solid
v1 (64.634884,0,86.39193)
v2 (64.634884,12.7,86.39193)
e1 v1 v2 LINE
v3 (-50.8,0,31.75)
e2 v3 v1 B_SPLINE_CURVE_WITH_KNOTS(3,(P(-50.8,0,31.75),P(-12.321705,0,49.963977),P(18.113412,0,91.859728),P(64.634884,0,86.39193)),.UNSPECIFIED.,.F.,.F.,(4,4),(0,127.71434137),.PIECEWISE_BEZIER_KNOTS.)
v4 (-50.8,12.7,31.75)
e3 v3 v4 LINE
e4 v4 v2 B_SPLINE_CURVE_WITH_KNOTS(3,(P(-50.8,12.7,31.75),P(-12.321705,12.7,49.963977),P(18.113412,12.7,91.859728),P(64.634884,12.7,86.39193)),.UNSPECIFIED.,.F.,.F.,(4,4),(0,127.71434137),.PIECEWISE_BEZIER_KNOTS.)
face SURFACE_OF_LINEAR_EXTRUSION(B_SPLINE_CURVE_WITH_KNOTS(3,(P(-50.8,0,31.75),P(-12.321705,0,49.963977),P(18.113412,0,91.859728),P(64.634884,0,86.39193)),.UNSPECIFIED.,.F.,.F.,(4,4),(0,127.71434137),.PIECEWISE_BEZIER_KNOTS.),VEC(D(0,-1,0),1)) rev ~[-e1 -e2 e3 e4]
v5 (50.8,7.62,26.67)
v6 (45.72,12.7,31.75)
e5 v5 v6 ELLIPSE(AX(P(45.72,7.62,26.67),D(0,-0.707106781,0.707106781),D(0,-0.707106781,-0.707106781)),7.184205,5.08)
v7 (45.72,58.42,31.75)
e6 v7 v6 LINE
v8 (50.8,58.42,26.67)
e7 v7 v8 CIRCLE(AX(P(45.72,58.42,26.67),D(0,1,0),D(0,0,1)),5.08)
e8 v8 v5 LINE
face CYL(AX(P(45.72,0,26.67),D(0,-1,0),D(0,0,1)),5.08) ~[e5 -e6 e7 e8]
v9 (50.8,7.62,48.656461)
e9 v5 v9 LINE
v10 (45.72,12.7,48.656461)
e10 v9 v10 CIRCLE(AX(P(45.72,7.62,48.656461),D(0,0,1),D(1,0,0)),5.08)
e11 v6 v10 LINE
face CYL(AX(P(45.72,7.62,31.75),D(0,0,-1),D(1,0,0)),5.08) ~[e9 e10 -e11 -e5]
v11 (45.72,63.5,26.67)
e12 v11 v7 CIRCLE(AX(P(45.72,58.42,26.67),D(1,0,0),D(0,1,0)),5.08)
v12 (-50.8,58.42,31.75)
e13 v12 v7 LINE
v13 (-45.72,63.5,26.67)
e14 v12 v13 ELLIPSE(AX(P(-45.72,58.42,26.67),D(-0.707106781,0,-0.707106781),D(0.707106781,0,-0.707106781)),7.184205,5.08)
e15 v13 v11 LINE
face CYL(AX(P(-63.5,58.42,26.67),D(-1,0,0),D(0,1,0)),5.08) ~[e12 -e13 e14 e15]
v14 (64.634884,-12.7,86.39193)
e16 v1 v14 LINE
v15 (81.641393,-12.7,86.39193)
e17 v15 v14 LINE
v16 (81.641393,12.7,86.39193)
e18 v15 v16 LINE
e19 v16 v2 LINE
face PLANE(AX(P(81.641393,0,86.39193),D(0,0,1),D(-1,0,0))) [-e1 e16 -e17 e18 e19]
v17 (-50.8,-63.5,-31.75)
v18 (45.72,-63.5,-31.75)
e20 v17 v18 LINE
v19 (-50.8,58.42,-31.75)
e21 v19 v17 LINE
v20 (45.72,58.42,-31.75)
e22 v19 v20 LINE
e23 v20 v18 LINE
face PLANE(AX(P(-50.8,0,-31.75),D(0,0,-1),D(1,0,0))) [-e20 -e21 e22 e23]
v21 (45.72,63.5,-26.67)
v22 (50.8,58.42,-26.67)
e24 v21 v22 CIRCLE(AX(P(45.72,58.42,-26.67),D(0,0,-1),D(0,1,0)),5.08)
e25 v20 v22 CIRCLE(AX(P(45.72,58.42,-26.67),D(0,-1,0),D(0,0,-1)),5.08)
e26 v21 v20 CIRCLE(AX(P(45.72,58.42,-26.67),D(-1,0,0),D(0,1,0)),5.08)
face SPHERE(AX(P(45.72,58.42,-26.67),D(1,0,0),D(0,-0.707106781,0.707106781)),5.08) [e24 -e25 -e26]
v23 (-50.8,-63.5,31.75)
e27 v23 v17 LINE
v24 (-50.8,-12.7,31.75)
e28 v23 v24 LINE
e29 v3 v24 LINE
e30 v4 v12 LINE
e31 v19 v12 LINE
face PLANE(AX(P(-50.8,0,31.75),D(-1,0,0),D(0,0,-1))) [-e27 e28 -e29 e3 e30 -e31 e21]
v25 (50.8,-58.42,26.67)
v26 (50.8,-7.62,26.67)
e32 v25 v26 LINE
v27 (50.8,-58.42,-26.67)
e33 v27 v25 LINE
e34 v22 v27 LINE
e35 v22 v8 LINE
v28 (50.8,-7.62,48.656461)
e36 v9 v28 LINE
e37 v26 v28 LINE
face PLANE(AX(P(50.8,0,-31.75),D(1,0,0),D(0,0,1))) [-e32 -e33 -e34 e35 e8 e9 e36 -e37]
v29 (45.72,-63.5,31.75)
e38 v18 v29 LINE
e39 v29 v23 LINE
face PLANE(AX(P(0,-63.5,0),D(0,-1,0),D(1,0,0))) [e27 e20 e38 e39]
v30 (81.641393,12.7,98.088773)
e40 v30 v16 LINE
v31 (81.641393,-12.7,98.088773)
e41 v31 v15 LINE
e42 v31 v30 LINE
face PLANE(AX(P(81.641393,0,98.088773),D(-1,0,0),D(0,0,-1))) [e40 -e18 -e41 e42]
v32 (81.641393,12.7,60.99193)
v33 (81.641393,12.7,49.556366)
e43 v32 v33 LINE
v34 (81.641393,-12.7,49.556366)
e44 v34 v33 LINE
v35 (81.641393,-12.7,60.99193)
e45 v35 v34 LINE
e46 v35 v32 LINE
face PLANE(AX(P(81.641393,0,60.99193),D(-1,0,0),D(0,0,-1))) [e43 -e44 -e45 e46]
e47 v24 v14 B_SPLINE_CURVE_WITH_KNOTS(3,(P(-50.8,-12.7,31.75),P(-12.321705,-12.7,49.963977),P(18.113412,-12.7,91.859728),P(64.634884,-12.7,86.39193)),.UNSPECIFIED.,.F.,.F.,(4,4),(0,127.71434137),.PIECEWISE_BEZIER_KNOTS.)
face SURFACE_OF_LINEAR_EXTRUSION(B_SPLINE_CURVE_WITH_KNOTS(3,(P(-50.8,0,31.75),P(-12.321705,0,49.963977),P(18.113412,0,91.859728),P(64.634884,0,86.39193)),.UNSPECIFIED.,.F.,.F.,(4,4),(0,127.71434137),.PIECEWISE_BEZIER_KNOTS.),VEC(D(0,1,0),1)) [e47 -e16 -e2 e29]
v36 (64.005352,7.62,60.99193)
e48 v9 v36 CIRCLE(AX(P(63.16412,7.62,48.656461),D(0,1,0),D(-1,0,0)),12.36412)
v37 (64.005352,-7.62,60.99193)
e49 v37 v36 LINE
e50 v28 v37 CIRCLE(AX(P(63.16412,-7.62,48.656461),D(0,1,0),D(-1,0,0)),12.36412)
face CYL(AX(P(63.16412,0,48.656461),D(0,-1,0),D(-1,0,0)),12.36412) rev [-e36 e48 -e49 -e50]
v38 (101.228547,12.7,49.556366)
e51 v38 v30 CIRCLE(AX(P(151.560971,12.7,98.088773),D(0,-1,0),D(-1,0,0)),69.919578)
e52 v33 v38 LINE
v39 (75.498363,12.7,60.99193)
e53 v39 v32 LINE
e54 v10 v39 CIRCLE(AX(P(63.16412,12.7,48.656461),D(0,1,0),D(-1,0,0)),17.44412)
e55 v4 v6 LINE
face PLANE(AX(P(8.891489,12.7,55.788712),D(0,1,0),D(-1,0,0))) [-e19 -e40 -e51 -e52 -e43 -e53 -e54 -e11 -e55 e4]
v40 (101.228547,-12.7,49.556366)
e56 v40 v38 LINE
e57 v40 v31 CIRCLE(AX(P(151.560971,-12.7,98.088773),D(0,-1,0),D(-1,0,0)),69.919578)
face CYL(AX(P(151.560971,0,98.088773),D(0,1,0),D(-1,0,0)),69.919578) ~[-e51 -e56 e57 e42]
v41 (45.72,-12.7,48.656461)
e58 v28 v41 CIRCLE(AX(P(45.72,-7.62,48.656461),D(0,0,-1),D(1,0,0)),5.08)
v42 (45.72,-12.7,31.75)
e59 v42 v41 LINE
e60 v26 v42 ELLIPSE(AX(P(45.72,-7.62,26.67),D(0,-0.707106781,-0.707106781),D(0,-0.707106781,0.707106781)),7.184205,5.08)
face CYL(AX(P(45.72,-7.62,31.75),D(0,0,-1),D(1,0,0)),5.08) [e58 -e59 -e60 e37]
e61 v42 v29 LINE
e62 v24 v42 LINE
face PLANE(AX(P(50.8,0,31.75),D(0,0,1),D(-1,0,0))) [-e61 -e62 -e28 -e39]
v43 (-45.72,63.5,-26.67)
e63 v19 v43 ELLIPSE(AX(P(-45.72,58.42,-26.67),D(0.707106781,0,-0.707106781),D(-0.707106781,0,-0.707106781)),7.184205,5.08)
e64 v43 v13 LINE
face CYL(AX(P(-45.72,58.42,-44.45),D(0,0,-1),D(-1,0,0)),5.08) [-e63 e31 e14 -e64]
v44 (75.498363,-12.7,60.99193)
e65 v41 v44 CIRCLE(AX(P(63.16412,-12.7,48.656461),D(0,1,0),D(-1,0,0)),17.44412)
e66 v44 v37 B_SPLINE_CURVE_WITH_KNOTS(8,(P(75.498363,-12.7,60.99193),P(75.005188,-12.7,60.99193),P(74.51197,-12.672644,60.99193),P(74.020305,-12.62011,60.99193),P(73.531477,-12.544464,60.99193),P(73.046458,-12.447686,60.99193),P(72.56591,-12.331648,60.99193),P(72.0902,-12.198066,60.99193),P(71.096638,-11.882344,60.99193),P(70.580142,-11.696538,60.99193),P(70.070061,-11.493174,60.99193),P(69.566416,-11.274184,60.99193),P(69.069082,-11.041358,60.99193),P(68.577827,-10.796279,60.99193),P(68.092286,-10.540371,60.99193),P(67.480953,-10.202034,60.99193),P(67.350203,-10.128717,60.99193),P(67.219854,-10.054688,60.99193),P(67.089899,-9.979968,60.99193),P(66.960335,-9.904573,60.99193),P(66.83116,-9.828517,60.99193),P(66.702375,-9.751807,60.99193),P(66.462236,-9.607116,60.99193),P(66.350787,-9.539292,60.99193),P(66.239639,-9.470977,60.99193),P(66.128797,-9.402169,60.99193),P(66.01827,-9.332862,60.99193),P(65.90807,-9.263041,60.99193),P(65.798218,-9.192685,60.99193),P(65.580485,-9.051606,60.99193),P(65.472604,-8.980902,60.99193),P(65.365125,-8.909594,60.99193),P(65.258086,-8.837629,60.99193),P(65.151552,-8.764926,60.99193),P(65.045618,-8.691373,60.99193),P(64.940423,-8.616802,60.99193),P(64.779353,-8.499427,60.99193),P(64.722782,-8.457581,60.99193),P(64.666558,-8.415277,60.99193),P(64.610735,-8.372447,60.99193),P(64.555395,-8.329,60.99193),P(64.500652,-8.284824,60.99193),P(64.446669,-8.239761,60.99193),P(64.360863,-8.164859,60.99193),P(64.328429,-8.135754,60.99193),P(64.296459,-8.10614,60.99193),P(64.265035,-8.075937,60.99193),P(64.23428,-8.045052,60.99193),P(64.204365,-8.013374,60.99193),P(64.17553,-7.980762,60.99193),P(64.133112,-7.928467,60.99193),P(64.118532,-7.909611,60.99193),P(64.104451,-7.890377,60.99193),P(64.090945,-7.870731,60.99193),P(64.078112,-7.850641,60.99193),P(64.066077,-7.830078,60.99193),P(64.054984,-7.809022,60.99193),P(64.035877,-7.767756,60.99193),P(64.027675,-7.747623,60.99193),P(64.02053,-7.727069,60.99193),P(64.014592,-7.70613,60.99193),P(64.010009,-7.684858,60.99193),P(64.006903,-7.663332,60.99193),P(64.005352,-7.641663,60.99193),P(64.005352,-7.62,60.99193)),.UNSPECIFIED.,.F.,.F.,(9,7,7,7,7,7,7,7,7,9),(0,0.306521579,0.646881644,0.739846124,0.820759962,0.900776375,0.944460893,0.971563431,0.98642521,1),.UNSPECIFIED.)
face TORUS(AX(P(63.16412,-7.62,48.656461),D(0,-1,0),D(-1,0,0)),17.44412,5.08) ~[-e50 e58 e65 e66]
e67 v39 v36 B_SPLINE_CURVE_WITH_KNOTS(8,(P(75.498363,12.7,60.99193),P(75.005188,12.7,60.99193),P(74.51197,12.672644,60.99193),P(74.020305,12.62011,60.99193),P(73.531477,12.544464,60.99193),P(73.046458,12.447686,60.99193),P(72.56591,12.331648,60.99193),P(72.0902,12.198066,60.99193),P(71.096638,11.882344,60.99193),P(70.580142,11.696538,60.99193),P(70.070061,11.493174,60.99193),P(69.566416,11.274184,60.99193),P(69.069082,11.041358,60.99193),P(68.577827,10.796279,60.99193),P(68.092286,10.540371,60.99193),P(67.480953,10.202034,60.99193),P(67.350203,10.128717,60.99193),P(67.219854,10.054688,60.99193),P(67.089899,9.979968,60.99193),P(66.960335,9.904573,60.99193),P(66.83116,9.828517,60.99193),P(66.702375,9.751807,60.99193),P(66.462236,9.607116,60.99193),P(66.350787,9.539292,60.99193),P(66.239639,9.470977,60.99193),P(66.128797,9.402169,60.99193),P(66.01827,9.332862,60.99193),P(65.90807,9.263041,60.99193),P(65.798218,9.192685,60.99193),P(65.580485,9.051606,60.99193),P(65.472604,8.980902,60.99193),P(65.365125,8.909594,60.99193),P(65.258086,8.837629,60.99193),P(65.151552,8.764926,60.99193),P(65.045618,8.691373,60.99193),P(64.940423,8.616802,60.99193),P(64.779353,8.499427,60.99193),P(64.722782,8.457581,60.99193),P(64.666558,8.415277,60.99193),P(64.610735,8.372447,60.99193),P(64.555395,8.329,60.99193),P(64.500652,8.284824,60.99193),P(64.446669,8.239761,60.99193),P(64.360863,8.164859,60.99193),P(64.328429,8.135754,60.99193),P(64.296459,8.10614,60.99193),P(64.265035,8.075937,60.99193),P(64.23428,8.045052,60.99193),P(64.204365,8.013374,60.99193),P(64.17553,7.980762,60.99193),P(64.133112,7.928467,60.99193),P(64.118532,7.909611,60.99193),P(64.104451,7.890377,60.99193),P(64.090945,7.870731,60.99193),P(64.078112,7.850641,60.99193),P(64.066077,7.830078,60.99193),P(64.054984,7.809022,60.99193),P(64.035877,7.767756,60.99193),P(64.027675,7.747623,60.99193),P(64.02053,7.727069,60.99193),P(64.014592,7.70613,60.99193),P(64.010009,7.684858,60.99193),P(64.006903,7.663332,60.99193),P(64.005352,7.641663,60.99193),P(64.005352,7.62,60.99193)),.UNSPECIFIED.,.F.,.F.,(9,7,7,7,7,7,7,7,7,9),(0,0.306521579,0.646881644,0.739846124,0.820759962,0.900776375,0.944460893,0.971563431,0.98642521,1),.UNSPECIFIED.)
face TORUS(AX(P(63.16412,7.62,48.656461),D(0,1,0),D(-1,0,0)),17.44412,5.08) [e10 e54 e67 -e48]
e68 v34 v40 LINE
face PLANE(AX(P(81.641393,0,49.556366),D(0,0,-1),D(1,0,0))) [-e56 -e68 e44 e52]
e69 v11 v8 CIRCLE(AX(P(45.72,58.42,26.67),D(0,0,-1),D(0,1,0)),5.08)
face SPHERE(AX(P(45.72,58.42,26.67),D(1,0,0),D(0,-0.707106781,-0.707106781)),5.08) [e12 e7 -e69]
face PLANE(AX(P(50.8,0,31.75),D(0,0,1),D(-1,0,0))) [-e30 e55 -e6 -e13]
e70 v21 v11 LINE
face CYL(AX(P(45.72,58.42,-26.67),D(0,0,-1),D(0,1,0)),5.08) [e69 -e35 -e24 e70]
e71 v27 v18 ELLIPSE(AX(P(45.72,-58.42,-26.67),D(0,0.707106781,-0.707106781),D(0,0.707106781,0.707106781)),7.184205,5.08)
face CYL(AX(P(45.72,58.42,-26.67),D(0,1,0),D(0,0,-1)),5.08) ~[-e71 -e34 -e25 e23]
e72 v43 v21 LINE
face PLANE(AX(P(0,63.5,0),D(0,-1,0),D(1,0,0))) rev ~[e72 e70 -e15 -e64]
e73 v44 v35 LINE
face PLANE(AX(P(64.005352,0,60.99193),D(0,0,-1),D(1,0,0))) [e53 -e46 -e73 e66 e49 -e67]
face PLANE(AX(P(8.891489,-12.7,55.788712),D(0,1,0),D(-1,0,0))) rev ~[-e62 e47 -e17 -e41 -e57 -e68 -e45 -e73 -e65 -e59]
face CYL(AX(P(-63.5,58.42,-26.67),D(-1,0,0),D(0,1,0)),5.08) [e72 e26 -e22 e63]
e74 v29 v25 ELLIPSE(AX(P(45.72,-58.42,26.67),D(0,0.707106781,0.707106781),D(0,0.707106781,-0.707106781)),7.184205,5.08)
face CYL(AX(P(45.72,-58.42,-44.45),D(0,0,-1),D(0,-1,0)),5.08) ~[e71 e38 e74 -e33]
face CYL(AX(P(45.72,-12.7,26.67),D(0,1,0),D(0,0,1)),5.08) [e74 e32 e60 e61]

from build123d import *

# Parameters (mm, degrees)
F1_DEPTH     = 63.5
F2_DEPTH     = 12.7
F2_FACE_W    = 69.919578209
F2_FACE_H    = 25.4
F4_T1_DEPTH  = 134.62
F4_T3_DEPTH  = 53.34
F4_T5_DEPTH  = 45.72
F4_T7_DEPTH  = 16.9064607487
F4_T9_DEPTH  = 63.5
F4_T11_DEPTH = 88.9
F4_T13_DEPTH = 109.22
F4_S17_W     = 5.08
F4_S17_H     = 5.08
F4_T18_DEPTH = 5.08
F4_S23_W     = 5.08
F4_S23_H     = 5.08
F4_T24_DEPTH = 5.08
F4_T28_ANGLE = 152.7793054157
F4_T30_ANGLE = 152.7793054157
F4_T35_DEPTH = 58.42
F4_T39_DEPTH = 29.6064607487
F4_T46_DEPTH = 76.2
F4_T50_DEPTH = 29.6064607487


# Not quite as in the source:
# - a fillet or chamfer that OpenCascade refuses, or shapes differently, is made with other operations: its cross-section is extruded or revolved along the edge and cut away or added


with BuildPart() as f1:
    # F0 (on Front) → F1 (new body, symmetric)
    with BuildSketch(Plane.XZ):
        Polygon((-50.8, 31.75), (-50.8, -31.75), (50.8, -31.75), (50.8, 31.75), (25.4, 31.75), align=None)
    extrude(amount=F1_DEPTH, both=True)

    # F0 (on Front) → F2 (join, symmetric)
    with BuildSketch(Plane.XZ):
        with BuildLine():
            add(Edge.make_bspline(
                [(-50.8, 31.75), (-12.3217052749, 49.9639766453), (18.113411963, 91.8597280979), (64.6348841752, 86.3919299359)],
                knots=[0, 0, 0, 0, 127.7143413704, 127.7143413704, 127.7143413704, 127.7143413704], degree=3))
            Line((-50.8, 31.75), (25.4, 31.75))
            Line((25.4, 31.75), (25.4, 48.6564607487))
            ThreePointArc((25.4, 48.6564607487), (36.9860122893, 75.8747531778), (64.6348841752, 86.3919299359))
        make_face()
        with BuildLine():
            Line((25.4, 31.75), (50.8, 31.75))
            Line((50.8, 31.75), (50.8, 48.6564607487))
            ThreePointArc((50.8, 48.6564607487), (54.7240260068, 57.691740436), (64.0053517954, 60.9919299359))
            Line((64.0053517954, 60.9919299359), (81.6413929723, 60.9919299359))
            Line((81.6413929723, 60.9919299359), (81.6413929723, 86.3919299359))
            Line((81.6413929723, 86.3919299359), (64.6348841752, 86.3919299359))
            ThreePointArc((64.6348841752, 86.3919299359), (36.9860122893, 75.8747531778), (25.4, 48.6564607487))
            Line((25.4, 48.6564607487), (25.4, 31.75))
        make_face()
        Polygon((81.6413929723, 98.0887729745), (81.6413929723, 86.3919299359), (81.6413929723, 60.9919299359), (81.6413929723, 49.5563661095), (151.5609711813, 49.5563661095), (151.5609711813, 98.0887729745), align=None)
    extrude(amount=F2_DEPTH, both=True)

    # F2_face (on face) → F3 (revolve)
    with BuildSketch(Plane(origin=(116.6011820768, 0, 98.0887729745), x_dir=(1, 0, 0), z_dir=(0, 0, 1))):
        Rectangle(F2_FACE_W, F2_FACE_H)
    revolve(axis=Axis((151.5609711813, 0, 98.0887729745), (0, -1, 0)))

    # F4: fillet of radius 5.08 on 13 edges, made by hand

    # F4_s2 → F4_t1 (cut)
    with BuildSketch(Plane.XZ.offset(-58.42)):
        with BuildLine():
            ThreePointArc((45.72, -31.75), (49.3121024484, -30.2621024484), (50.8, -26.67))
            Line((50.8, -26.67), (50.8, -31.75))
            Line((50.8, -31.75), (45.72, -31.75))
        make_face()
    extrude(amount=F4_T1_DEPTH, mode=Mode.SUBTRACT)

    # F4_s4 → F4_t3 (cut)
    with BuildSketch(Plane.XY.offset(-26.67)):
        with BuildLine():
            ThreePointArc((45.72, 63.5), (49.3121024484, 62.0121024484), (50.8, 58.42))
            Line((50.8, 58.42), (50.8, 63.5))
            Line((50.8, 63.5), (45.72, 63.5))
        make_face()
    extrude(amount=F4_T3_DEPTH, mode=Mode.SUBTRACT)

    # F4_s6 → F4_t5 (cut)
    with BuildSketch(Plane.XZ.offset(-58.42)):
        with BuildLine():
            ThreePointArc((45.72, 31.75), (49.3121024484, 30.2621024484), (50.8, 26.67))
            Line((50.8, 26.67), (50.8, 31.75))
            Line((50.8, 31.75), (45.72, 31.75))
        make_face()
    extrude(amount=F4_T5_DEPTH, mode=Mode.SUBTRACT)

    # F4_s8 → F4_t7 (cut)
    with BuildSketch(Plane.XY.offset(31.75)):
        with BuildLine():
            ThreePointArc((50.8, 7.62), (49.3121024484, 11.2121024484), (45.72, 12.7))
            Line((45.72, 12.7), (50.8, 12.7))
            Line((50.8, 12.7), (50.8, 7.62))
        make_face()
        with BuildLine():
            ThreePointArc((50.8, -7.62), (49.3121024484, -11.2121024484), (45.72, -12.7))
            Line((45.72, -12.7), (50.8, -12.7))
            Line((50.8, -12.7), (50.8, -7.62))
        make_face()
    extrude(amount=F4_T7_DEPTH, mode=Mode.SUBTRACT)

    # F4_s10 → F4_t9 (cut)
    with BuildSketch(Plane.XZ.offset(12.7)):
        with BuildLine():
            ThreePointArc((45.72, 31.75), (49.3121024484, 30.2621024484), (50.8, 26.67))
            Line((50.8, 26.67), (50.8, 31.75))
            Line((50.8, 31.75), (45.72, 31.75))
        make_face()
    extrude(amount=F4_T9_DEPTH, mode=Mode.SUBTRACT)

    # F4_s12 → F4_t11 (cut)
    with BuildSketch(Plane.XY.offset(-44.45)):
        with BuildLine():
            ThreePointArc((45.72, -63.5), (49.3121024484, -62.0121024484), (50.8, -58.42))
            Line((50.8, -58.42), (50.8, -63.5))
            Line((50.8, -63.5), (45.72, -63.5))
        make_face()
        with BuildLine():
            ThreePointArc((-50.8, 58.42), (-49.3121024484, 62.0121024484), (-45.72, 63.5))
            Line((-45.72, 63.5), (-50.8, 63.5))
            Line((-50.8, 63.5), (-50.8, 58.42))
        make_face()
    extrude(amount=F4_T11_DEPTH, mode=Mode.SUBTRACT)

    # F4_s14 → F4_t13 (cut)
    with BuildSketch(Plane.YZ.offset(-63.5)):
        with BuildLine():
            ThreePointArc((63.5, -26.67), (62.0121024484, -30.2621024484), (58.42, -31.75))
            Line((58.42, -31.75), (63.5, -31.75))
            Line((63.5, -31.75), (63.5, -26.67))
        make_face()
        with BuildLine():
            ThreePointArc((63.5, 26.67), (62.0121024484, 30.2621024484), (58.42, 31.75))
            Line((58.42, 31.75), (63.5, 31.75))
            Line((63.5, 31.75), (63.5, 26.67))
        make_face()
    extrude(amount=F4_T13_DEPTH, mode=Mode.SUBTRACT)


with BuildPart() as f4_tool16:
    # F4_s17 → F4_t18 (new body)
    with BuildSketch(Plane.YZ.offset(45.72)):
        with Locations((60.96, -29.21)):
            Rectangle(F4_S17_W, F4_S17_H)
    extrude(amount=F4_T18_DEPTH)

    # F4_s19 → F4_t20 (revolve, cut)
    with BuildSketch(Plane(origin=(45.72, 58.42, -26.67), x_dir=(0, -0.7071067812, 0.7071067812), z_dir=(0, 0.7071067812, 0.7071067812))):
        with BuildLine():
            ThreePointArc((0, -5.08), (5.08, 0), (0, 5.08))
            Line((0, 5.08), (0, -5.08))
        make_face()
    revolve(axis=Axis((45.72, 58.42, -26.67), (1, 0, 0)), mode=Mode.SUBTRACT)


with BuildPart() as f1_1:
    add(f1.part)

    # F4_t15: cut F4_tool16
    add(f4_tool16.part, mode=Mode.SUBTRACT)


with BuildPart() as f4_tool22:
    # F4_s23 → F4_t24 (new body)
    with BuildSketch(Plane.YZ.offset(45.72)):
        with Locations((60.96, 29.21)):
            Rectangle(F4_S23_W, F4_S23_H)
    extrude(amount=F4_T24_DEPTH)

    # F4_s25 → F4_t26 (revolve, cut)
    with BuildSketch(Plane(origin=(45.72, 58.42, 26.67), x_dir=(0, -0.7071067812, -0.7071067812), z_dir=(0, -0.7071067812, 0.7071067812))):
        with BuildLine():
            ThreePointArc((0, -5.08), (5.08, 0), (0, 5.08))
            Line((0, 5.08), (0, -5.08))
        make_face()
    revolve(axis=Axis((45.72, 58.42, 26.67), (1, 0, 0)), mode=Mode.SUBTRACT)


with BuildPart() as f1_2:
    add(f1_1.part)

    # F4_t21: cut F4_tool22
    add(f4_tool22.part, mode=Mode.SUBTRACT)

    # F4_s27 → F4_t28 (revolve, cut)
    with BuildSketch(Plane.XY.offset(48.6564607487)):
        with BuildLine():
            ThreePointArc((45.72, -12.7), (49.3121024484, -11.2121024484), (50.8, -7.62))
            Line((50.8, -7.62), (50.8, -12.7))
            Line((50.8, -12.7), (45.72, -12.7))
        make_face()
    revolve(axis=Axis((63.1641202888, -12.7, 48.6564607487), (0, 1, 0)), revolution_arc=F4_T28_ANGLE, mode=Mode.SUBTRACT)

    # F4_s29 → F4_t30 (revolve, cut)
    with BuildSketch(Plane.XY.offset(48.6564607487)):
        with BuildLine():
            ThreePointArc((45.72, 12.7), (49.3121024484, 11.2121024484), (50.8, 7.62))
            Line((50.8, 7.62), (50.8, 12.7))
            Line((50.8, 12.7), (45.72, 12.7))
        make_face()
    revolve(axis=Axis((63.1641202888, 12.7, 48.6564607487), (0, 1, 0)), revolution_arc=F4_T30_ANGLE, mode=Mode.SUBTRACT)


with BuildPart() as f4_tool33:
    # F4_s34 → F4_t35 (new body)
    with BuildSketch(Plane.XZ):
        with BuildLine():
            ThreePointArc((45.72, 31.75), (49.3121024484, 30.2621024484), (50.8, 26.67))
            Line((50.8, 26.67), (50.8, 31.75))
            Line((50.8, 31.75), (45.72, 31.75))
        make_face()
    extrude(amount=-F4_T35_DEPTH)

    split(bisect_by=Plane.XZ.offset(-12.7), keep=Keep.TOP)


with BuildPart() as f4_tool37:
    # F4_s38 → F4_t39 (new body)
    with BuildSketch(Plane.XY.offset(19.05)):
        with BuildLine():
            ThreePointArc((50.8, 7.62), (49.3121024484, 11.2121024484), (45.72, 12.7))
            Line((45.72, 12.7), (50.8, 12.7))
            Line((50.8, 12.7), (50.8, 7.62))
        make_face()
    extrude(amount=F4_T39_DEPTH)

    split(bisect_by=Plane.XY.offset(31.75), keep=Keep.BOTTOM)


with BuildPart() as f4_tool33_1:
    add(f4_tool33.part)

    # F4_t41: intersect F4_tool37
    add(f4_tool37.part, mode=Mode.INTERSECT)


with BuildPart() as f1_3:
    add(f1_2.part)

    # F4_t31: cut F4_tool33
    add(f4_tool33_1.part, mode=Mode.SUBTRACT)


with BuildPart() as f4_tool44:
    # F4_s45 → F4_t46 (new body)
    with BuildSketch(Plane.XZ.offset(76.2)):
        with BuildLine():
            ThreePointArc((45.72, 31.75), (49.3121024484, 30.2621024484), (50.8, 26.67))
            Line((50.8, 26.67), (50.8, 31.75))
            Line((50.8, 31.75), (45.72, 31.75))
        make_face()
    extrude(amount=-F4_T46_DEPTH)

    split(bisect_by=Plane.XZ.offset(12.7), keep=Keep.BOTTOM)


with BuildPart() as f4_tool48:
    # F4_s49 → F4_t50 (new body)
    with BuildSketch(Plane.XY.offset(19.05)):
        with BuildLine():
            ThreePointArc((50.8, -7.62), (49.3121024484, -11.2121024484), (45.72, -12.7))
            Line((45.72, -12.7), (50.8, -12.7))
            Line((50.8, -12.7), (50.8, -7.62))
        make_face()
    extrude(amount=F4_T50_DEPTH)

    split(bisect_by=Plane.XY.offset(31.75), keep=Keep.BOTTOM)


with BuildPart() as f4_tool44_1:
    add(f4_tool44.part)

    # F4_t52: intersect F4_tool48
    add(f4_tool48.part, mode=Mode.INTERSECT)


with BuildPart() as f1_4:
    add(f1_3.part)

    # F4_t42: cut F4_tool44
    add(f4_tool44_1.part, mode=Mode.SUBTRACT)


solid = f1_4.part
